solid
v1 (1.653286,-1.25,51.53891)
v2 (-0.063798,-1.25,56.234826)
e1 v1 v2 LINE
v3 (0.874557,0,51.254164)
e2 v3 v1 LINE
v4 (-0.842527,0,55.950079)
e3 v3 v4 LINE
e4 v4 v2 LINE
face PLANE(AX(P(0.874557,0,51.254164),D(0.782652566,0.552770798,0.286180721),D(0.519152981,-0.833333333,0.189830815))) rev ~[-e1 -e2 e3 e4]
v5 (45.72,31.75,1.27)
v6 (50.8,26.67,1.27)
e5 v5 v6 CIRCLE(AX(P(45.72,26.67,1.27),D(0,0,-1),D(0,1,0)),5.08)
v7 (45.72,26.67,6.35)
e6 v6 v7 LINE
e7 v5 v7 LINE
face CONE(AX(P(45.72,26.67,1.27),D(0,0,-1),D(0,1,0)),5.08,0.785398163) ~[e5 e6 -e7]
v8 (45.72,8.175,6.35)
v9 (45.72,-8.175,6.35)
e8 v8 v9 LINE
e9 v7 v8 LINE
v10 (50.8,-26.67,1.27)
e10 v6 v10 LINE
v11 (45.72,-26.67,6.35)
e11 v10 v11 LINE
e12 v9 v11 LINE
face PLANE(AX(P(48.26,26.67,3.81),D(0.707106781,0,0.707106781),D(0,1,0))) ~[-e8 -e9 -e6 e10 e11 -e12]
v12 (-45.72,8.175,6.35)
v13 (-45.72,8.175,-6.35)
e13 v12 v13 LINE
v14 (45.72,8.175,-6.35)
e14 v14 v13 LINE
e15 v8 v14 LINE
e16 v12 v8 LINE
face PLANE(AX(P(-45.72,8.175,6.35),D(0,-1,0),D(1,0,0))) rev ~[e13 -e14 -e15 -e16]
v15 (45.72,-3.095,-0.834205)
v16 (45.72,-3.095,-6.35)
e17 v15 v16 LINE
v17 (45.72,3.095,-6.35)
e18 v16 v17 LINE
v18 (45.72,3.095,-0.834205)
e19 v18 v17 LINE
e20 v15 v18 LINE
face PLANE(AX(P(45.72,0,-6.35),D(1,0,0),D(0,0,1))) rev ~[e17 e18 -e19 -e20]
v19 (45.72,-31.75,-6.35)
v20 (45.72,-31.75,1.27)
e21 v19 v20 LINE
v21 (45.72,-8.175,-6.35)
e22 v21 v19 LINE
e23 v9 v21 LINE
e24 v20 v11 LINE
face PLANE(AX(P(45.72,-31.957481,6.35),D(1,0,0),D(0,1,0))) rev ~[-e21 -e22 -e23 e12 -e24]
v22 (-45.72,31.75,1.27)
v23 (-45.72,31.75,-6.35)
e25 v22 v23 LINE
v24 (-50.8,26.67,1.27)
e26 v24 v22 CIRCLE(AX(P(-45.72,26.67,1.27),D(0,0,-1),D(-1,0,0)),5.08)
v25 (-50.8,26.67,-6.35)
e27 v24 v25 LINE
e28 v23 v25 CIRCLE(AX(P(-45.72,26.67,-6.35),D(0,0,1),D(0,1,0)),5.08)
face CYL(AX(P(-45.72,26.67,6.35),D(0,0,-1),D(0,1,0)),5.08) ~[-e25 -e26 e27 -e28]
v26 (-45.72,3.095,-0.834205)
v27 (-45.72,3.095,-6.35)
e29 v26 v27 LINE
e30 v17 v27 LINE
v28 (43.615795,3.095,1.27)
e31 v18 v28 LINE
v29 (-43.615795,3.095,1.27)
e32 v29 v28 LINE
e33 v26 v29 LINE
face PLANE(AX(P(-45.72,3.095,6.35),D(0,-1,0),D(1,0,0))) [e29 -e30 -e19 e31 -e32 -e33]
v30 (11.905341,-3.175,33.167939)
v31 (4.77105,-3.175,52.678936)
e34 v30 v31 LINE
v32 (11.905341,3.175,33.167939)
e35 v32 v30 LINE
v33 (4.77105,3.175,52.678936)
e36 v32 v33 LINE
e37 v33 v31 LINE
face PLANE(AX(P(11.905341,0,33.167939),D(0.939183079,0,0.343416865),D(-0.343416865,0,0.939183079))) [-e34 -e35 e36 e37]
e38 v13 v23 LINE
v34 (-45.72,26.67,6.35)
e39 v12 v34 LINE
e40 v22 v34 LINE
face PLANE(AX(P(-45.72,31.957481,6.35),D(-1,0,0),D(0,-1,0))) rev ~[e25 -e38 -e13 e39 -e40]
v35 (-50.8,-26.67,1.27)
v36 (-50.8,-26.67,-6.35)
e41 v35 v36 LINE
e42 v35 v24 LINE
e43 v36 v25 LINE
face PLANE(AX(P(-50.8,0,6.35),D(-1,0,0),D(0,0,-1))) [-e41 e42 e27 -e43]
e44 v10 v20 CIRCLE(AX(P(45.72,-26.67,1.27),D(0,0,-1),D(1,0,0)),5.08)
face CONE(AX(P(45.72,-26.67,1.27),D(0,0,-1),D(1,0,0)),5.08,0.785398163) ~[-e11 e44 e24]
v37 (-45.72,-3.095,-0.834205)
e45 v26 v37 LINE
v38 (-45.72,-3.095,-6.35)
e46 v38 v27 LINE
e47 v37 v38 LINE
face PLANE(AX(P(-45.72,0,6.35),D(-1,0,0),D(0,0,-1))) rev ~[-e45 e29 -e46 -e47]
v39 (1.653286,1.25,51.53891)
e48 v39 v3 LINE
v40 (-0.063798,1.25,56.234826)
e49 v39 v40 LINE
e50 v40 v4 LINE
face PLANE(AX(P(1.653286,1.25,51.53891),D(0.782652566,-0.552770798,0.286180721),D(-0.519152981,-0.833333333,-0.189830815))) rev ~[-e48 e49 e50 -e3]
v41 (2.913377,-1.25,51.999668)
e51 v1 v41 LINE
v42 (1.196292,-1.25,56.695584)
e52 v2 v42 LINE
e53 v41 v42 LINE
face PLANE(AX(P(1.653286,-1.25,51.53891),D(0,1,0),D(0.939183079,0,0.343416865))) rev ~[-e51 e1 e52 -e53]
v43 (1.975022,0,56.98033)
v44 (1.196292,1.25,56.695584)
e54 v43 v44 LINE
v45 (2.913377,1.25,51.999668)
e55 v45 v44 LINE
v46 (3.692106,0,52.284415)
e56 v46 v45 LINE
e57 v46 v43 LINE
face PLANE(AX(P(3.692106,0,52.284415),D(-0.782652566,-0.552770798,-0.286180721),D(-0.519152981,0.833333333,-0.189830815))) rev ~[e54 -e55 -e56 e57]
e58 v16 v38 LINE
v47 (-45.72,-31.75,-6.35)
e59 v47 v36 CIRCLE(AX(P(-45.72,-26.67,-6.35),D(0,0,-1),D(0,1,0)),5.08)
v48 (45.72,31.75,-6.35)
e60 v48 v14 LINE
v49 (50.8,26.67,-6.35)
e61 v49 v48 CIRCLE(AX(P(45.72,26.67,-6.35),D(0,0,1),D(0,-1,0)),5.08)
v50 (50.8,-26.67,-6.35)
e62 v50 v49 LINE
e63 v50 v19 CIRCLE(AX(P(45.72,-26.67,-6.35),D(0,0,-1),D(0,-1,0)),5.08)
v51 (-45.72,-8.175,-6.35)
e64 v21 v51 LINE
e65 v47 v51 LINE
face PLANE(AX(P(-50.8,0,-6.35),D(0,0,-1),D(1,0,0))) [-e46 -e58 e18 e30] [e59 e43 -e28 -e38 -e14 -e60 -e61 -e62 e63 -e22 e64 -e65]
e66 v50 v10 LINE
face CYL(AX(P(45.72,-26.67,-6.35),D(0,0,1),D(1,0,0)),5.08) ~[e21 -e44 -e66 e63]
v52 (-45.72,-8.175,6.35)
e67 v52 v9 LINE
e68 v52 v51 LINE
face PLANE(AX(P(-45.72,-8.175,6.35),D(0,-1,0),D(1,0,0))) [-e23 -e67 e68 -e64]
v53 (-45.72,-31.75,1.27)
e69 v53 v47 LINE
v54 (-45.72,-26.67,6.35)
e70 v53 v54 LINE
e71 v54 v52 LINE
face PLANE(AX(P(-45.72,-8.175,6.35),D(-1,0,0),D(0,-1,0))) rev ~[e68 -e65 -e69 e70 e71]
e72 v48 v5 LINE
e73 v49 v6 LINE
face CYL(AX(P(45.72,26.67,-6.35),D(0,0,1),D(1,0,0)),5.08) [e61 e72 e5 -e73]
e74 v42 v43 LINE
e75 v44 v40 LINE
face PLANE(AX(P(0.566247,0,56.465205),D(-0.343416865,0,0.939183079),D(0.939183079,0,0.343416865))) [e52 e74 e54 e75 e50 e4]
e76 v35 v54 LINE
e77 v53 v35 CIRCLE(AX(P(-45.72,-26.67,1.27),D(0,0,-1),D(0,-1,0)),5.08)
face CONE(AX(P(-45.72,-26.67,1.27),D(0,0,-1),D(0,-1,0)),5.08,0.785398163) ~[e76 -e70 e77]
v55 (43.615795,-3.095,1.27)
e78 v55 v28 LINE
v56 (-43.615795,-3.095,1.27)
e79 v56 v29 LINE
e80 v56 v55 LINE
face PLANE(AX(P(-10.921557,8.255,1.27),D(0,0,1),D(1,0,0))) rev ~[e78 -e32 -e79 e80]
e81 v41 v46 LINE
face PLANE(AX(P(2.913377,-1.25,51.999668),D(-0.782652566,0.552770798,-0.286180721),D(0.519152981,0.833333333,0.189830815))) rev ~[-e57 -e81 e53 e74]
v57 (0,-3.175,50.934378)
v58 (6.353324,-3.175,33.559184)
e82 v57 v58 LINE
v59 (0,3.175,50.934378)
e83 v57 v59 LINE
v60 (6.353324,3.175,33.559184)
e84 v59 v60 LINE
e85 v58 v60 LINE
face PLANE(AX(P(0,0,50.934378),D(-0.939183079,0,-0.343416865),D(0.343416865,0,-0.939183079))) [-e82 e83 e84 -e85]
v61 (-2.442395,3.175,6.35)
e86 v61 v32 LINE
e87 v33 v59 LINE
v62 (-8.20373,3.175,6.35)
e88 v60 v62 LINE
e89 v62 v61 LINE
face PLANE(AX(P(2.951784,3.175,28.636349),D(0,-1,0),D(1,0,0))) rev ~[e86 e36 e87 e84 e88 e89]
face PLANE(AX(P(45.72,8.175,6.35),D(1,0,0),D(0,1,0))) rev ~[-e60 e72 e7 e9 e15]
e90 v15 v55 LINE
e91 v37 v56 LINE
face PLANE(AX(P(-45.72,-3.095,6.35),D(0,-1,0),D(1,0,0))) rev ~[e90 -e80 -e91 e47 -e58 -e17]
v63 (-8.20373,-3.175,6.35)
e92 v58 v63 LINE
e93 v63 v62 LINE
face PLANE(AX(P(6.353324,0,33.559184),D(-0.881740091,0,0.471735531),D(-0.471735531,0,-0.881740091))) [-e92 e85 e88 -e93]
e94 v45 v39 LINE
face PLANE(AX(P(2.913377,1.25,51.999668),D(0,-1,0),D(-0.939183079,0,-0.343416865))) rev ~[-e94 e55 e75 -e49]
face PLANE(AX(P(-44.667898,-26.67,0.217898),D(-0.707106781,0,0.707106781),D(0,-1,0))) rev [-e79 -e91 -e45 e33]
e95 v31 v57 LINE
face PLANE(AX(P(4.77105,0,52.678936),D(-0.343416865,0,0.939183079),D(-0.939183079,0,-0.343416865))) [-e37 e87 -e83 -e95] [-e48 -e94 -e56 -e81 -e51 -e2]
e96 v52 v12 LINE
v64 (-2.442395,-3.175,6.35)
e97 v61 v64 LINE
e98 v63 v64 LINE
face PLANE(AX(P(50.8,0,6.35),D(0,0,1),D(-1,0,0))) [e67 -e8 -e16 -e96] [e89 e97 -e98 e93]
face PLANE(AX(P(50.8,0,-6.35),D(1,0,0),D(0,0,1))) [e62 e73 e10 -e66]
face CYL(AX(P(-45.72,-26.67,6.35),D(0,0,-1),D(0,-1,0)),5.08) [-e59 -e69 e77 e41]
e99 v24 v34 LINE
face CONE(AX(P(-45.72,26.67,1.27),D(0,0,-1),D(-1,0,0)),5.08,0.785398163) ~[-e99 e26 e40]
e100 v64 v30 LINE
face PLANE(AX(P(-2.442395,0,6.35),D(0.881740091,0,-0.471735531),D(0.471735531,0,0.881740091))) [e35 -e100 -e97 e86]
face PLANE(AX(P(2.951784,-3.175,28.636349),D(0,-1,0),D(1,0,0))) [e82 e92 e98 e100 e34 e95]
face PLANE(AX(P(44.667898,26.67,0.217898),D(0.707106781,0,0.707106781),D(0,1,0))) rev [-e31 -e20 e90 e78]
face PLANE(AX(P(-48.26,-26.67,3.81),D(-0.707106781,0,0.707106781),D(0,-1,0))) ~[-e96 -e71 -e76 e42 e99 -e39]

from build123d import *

# Parameters (mm, degrees)
F1_DEPTH     = 31.75
F2_DEPTH     = 3.175
F3_R         = 5.08
F4_SIZE      = 5.08
F6_DEPTH     = 5
F7_W         = 91.44
F7_H         = 18.495
F7_H_2       = 5.2874810565
F8_DEPTH     = 12.701
F9_T         = 5.08
F9_T3_DEPTH  = 22.86
F9_T5_DEPTH  = 16.51
F9_T7_DEPTH  = 15.9213350007
F9_T9_DEPTH  = 11.66
F9_T11_DEPTH = 11.5016876048
F9_T13_DEPTH = 11.66
F9_T15_DEPTH = 11.66
F9_T17_DEPTH = 11.5016876048
F9_T19_DEPTH = 11.66


# Not quite as in the source:
# - a shell that OpenCascade refuses in one call is made with other operations: the cavity is built on its own and cut out


with BuildPart() as f1:
    # F0 (on Front) → F1 (new body, symmetric)
    with BuildSketch(Plane.XZ):
        Polygon((50.8, -6.35), (50.8, 6.35), (-2.4423953146, 6.35), (-8.2037303153, 6.35), (-50.8, 6.35), (-50.8, -6.35), align=None)
    extrude(amount=F1_DEPTH, both=True)

    # F0 (on Front) → F2 (join, symmetric)
    with BuildSketch(Plane.XZ):
        Polygon((-8.2037303153, 6.35), (-2.4423953146, 6.35), (11.905341187, 33.1679385818), (4.7710500911, 52.6789357495), (0, 50.9343780577), (6.3533243835, 33.5591837482), align=None)
    extrude(amount=F2_DEPTH, both=True)

    # F3
    f3_edges = [f1.edges().sort_by_distance(p)[0] for p in [
        (-50.8, -31.75, 0),
        (50.8, -31.75, 0),
        (50.8, 31.75, 0),
        (-50.8, 31.75, 0),
    ]]
    fillet(f3_edges, radius=F3_R)

    # F4
    f4_edges = [f1.edges().sort_by_distance(p)[0] for p in [
        (50.8, 0, 6.35),
    ]]
    chamfer(f4_edges, length=F4_SIZE)

    # F5 (on face) → F6 (join)
    with BuildSketch(Plane(origin=(-16.4279316214, 0, 44.9274248875), x_dir=(0.9391830795, 0, 0.3434168651), z_dir=(-0.3434168651, 0, 0.9391830795))):
        Polygon((20.5937571299, 1.25), (19.2520695251, 1.25), (18.4229133275, 0), (19.2520695251, -1.25), (20.5937571299, -1.25), (21.4229133275, 0), align=None)
    extrude(amount=F6_DEPTH)

    # F7 (on face) → F8 (cut, through all)
    with BuildSketch(Plane.XY.offset(6.35)):
        with Locations((0, -17.4225)):
            Rectangle(F7_W, F7_H)
        with Locations((0, 17.4225)):
            Rectangle(F7_W, F7_H)
        with Locations((0, -29.3137405282)):
            Rectangle(F7_W, F7_H_2)
        with Locations((0, 29.3137405282)):
            Rectangle(F7_W, F7_H_2)
    extrude(amount=-F8_DEPTH, mode=Mode.SUBTRACT)

    # F9: shell of thickness 5.08, made by hand


with BuildPart() as f9_core1:
    # F9_t2: copy of F1
    add(f1.part)

    # the walls: a layer under each face that stays
    f9_faces = [f9_core1.faces().sort_by_distance(p)[0] for p in [
        (50.8, 0, -2.54),
        (48.26, 0, 3.81),
        (47.5160512242, 28.4660512242, 3.81),
        (45.72, 19.9625, 0),
        (0, 0, 6.35),
        (45.72, -19.9625, 0),
        (47.5160512242, -28.4660512242, 3.81),
        (-50.8, 0, -2.54),
        (-45.72, -19.9625, 0),
        (0, -8.175, 0),
        (0, 8.175, 0),
        (-45.72, 19.9625, 0),
        (-48.26, 0, 3.81),
        (-0.9252029659, 0, 19.9545918741),
        (8.55382927, 3.175, 29.5144678748),
        (8.55382927, -3.175, 29.5144678748),
        (4.7314729362, 0, 19.7589692909),
        (-47.5160512242, 28.4660512242, 3.81),
        (-47.5160512242, -28.4660512242, 3.81),
        (3.1766621917, 0, 42.246780903),
        (8.3381956391, 0, 42.9234371656),
        (3.975875076, 2.1166666667, 52.3881761342),
        (2.444199191, 0.625, 54.4899992105),
        (1.4247893073, 1.25, 54.1172470239),
        (0.4053794236, 0.625, 53.7444948373),
        (0.4053794236, -0.625, 53.7444948373),
        (1.4247893073, -1.25, 54.1172470239),
        (2.444199191, -0.625, 54.4899992105),
        (0.5662471447, 0, 56.4652047226),
    ]]
    thicken(f9_faces, amount=-F9_T, mode=Mode.SUBTRACT)

    # F9_s4 → F9_t3 (cut)
    with BuildSketch(Plane.XY.offset(-11.43)):
        Polygon((45.6692, 8.2258), (50.8, 8.175), (50.8, 3.095), (45.72, 3.095), align=None)
        Polygon((45.6692, -8.2258), (50.8, -8.175), (50.8, -3.095), (45.72, -3.095), align=None)
        Polygon((-45.6692, -8.2258), (-50.8, -8.175), (-50.8, -3.095), (-45.72, -3.095), align=None)
        Polygon((-45.6692, 8.2258), (-45.72, 3.095), (-50.8, 3.095), (-50.8, 8.175), align=None)
    extrude(amount=F9_T3_DEPTH, mode=Mode.SUBTRACT)

    # F9_s6 → F9_t5 (cut)
    with BuildSketch(Plane.XZ.offset(-8.255)):
        Polygon((-8.2485227119, 6.424764165), (-8.2037303153, 1.27), (-5.1602217701, 1.27), (-3.7244906507, 3.9535835029), align=None)
        Polygon((-2.3976029179, 6.376835835), (-2.4423953146, 1.27), (-10.9215566565, 1.27), (-6.9216349791, 8.7464164971), align=None)
        Polygon((6.2608214864, 33.5657023365), (10.832564048, 31.1627672512), (11.9053411319, 33.1679385857), (11.1243744273, 35.3037414227), align=None)
    extrude(amount=F9_T5_DEPTH, mode=Mode.SUBTRACT)

    # F9_s8 → F9_t7 (cut)
    with BuildSketch(Plane.YZ.offset(-13.2837303153)):
        Polygon((3.2258, 6.4008), (3.175, 1.27), (-1.905, 1.27), (-1.905, 6.35), align=None)
        Polygon((-3.2258, 6.4008), (-3.175, 1.27), (1.905, 1.27), (1.905, 6.35), align=None)
    extrude(amount=F9_T7_DEPTH, mode=Mode.SUBTRACT)

    # F9_s10 → F9_t9 (cut)
    with BuildSketch(Plane(origin=(8.7850864423, -14.1016340866, 3.2123096243), x_dir=(-0.8487666121, -0.5287676599, 0), z_dir=(-0.5191529807, 0.8333333333, -0.1898308147))):
        Polygon((-3.1675232496, 51.0265185517), (-4.6144586839, 46.1037076546), (0.2449508944, 44.6229853476), (1.7256732014, 49.4823949258), align=None)
    extrude(amount=F9_T9_DEPTH, mode=Mode.SUBTRACT)

    # F9_s12 → F9_t11 (cut)
    with BuildSketch(Plane(origin=(24.1123582833, 0, 8.8168011877), x_dir=(0, 1, 0), z_dir=(-0.9391830795, 0, -0.3434168651))):
        Polygon((1.3008, -47.8875060361), (1.25, -42.7567060361), (-3.83, -42.7567060361), (-3.83, -47.8367060361), align=None)
    extrude(amount=F9_T11_DEPTH, mode=Mode.SUBTRACT)

    # F9_s14 → F9_t13 (cut)
    with BuildSketch(Plane(origin=(8.7028980905, 13.9697070906, 3.1822570534), x_dir=(0.8487666121, -0.5287676599, 0), z_dir=(-0.5191529807, -0.8333333333, -0.1898308147))):
        Polygon((0.6788933364, 50.2682021828), (2.2230169623, 45.3750057318), (7.0824265406, 46.8557280388), (5.6017042336, 51.7151376171), align=None)
    extrude(amount=F9_T13_DEPTH, mode=Mode.SUBTRACT)

    # F9_s16 → F9_t15 (cut)
    with BuildSketch(Plane(origin=(2.6495743357, -4.253040424, 0.9688297542), x_dir=(0.8487666121, 0.5287676599, 0), z_dir=(0.5191529807, -0.8333333333, 0.1898308147))):
        Polygon((0.6788933364, 50.2682021828), (2.2230169623, 45.3750057318), (7.0824265406, 46.8557280388), (5.6017042336, 51.7151376171), align=None)
    extrude(amount=F9_T15_DEPTH, mode=Mode.SUBTRACT)

    # F9_s18 → F9_t17 (cut)
    with BuildSketch(Plane(origin=(13.3101678993, 0, 4.8669276876), x_dir=(0, 1, 0), z_dir=(0.9391830795, 0, 0.3434168651))):
        Polygon((-1.3008, 47.8875060361), (-1.25, 42.7567060361), (3.83, 42.7567060361), (3.83, 47.8367060361), align=None)
    extrude(amount=F9_T17_DEPTH, mode=Mode.SUBTRACT)

    # F9_s20 → F9_t19 (cut)
    with BuildSketch(Plane(origin=(2.7317626875, 4.38496742, 0.9988823252), x_dir=(-0.8487666121, 0.5287676599, 0), z_dir=(0.5191529807, 0.8333333333, 0.1898308147))):
        Polygon((-3.1675232496, 51.0265185517), (-4.6144586839, 46.1037076546), (0.2449508944, 44.6229853476), (1.7256732014, 49.4823949258), align=None)
    extrude(amount=F9_T19_DEPTH, mode=Mode.SUBTRACT)


with BuildPart() as f1_1:
    add(f1.part)

    # what is left inside the walls is the cavity
    f9_cavity = [f9_core1.part.solids().sort_by_distance(p)[0] for p in [
        (0, 3.0442, -3.81),
    ]]
    add(f9_cavity, mode=Mode.SUBTRACT)


solid = f1_1.part
